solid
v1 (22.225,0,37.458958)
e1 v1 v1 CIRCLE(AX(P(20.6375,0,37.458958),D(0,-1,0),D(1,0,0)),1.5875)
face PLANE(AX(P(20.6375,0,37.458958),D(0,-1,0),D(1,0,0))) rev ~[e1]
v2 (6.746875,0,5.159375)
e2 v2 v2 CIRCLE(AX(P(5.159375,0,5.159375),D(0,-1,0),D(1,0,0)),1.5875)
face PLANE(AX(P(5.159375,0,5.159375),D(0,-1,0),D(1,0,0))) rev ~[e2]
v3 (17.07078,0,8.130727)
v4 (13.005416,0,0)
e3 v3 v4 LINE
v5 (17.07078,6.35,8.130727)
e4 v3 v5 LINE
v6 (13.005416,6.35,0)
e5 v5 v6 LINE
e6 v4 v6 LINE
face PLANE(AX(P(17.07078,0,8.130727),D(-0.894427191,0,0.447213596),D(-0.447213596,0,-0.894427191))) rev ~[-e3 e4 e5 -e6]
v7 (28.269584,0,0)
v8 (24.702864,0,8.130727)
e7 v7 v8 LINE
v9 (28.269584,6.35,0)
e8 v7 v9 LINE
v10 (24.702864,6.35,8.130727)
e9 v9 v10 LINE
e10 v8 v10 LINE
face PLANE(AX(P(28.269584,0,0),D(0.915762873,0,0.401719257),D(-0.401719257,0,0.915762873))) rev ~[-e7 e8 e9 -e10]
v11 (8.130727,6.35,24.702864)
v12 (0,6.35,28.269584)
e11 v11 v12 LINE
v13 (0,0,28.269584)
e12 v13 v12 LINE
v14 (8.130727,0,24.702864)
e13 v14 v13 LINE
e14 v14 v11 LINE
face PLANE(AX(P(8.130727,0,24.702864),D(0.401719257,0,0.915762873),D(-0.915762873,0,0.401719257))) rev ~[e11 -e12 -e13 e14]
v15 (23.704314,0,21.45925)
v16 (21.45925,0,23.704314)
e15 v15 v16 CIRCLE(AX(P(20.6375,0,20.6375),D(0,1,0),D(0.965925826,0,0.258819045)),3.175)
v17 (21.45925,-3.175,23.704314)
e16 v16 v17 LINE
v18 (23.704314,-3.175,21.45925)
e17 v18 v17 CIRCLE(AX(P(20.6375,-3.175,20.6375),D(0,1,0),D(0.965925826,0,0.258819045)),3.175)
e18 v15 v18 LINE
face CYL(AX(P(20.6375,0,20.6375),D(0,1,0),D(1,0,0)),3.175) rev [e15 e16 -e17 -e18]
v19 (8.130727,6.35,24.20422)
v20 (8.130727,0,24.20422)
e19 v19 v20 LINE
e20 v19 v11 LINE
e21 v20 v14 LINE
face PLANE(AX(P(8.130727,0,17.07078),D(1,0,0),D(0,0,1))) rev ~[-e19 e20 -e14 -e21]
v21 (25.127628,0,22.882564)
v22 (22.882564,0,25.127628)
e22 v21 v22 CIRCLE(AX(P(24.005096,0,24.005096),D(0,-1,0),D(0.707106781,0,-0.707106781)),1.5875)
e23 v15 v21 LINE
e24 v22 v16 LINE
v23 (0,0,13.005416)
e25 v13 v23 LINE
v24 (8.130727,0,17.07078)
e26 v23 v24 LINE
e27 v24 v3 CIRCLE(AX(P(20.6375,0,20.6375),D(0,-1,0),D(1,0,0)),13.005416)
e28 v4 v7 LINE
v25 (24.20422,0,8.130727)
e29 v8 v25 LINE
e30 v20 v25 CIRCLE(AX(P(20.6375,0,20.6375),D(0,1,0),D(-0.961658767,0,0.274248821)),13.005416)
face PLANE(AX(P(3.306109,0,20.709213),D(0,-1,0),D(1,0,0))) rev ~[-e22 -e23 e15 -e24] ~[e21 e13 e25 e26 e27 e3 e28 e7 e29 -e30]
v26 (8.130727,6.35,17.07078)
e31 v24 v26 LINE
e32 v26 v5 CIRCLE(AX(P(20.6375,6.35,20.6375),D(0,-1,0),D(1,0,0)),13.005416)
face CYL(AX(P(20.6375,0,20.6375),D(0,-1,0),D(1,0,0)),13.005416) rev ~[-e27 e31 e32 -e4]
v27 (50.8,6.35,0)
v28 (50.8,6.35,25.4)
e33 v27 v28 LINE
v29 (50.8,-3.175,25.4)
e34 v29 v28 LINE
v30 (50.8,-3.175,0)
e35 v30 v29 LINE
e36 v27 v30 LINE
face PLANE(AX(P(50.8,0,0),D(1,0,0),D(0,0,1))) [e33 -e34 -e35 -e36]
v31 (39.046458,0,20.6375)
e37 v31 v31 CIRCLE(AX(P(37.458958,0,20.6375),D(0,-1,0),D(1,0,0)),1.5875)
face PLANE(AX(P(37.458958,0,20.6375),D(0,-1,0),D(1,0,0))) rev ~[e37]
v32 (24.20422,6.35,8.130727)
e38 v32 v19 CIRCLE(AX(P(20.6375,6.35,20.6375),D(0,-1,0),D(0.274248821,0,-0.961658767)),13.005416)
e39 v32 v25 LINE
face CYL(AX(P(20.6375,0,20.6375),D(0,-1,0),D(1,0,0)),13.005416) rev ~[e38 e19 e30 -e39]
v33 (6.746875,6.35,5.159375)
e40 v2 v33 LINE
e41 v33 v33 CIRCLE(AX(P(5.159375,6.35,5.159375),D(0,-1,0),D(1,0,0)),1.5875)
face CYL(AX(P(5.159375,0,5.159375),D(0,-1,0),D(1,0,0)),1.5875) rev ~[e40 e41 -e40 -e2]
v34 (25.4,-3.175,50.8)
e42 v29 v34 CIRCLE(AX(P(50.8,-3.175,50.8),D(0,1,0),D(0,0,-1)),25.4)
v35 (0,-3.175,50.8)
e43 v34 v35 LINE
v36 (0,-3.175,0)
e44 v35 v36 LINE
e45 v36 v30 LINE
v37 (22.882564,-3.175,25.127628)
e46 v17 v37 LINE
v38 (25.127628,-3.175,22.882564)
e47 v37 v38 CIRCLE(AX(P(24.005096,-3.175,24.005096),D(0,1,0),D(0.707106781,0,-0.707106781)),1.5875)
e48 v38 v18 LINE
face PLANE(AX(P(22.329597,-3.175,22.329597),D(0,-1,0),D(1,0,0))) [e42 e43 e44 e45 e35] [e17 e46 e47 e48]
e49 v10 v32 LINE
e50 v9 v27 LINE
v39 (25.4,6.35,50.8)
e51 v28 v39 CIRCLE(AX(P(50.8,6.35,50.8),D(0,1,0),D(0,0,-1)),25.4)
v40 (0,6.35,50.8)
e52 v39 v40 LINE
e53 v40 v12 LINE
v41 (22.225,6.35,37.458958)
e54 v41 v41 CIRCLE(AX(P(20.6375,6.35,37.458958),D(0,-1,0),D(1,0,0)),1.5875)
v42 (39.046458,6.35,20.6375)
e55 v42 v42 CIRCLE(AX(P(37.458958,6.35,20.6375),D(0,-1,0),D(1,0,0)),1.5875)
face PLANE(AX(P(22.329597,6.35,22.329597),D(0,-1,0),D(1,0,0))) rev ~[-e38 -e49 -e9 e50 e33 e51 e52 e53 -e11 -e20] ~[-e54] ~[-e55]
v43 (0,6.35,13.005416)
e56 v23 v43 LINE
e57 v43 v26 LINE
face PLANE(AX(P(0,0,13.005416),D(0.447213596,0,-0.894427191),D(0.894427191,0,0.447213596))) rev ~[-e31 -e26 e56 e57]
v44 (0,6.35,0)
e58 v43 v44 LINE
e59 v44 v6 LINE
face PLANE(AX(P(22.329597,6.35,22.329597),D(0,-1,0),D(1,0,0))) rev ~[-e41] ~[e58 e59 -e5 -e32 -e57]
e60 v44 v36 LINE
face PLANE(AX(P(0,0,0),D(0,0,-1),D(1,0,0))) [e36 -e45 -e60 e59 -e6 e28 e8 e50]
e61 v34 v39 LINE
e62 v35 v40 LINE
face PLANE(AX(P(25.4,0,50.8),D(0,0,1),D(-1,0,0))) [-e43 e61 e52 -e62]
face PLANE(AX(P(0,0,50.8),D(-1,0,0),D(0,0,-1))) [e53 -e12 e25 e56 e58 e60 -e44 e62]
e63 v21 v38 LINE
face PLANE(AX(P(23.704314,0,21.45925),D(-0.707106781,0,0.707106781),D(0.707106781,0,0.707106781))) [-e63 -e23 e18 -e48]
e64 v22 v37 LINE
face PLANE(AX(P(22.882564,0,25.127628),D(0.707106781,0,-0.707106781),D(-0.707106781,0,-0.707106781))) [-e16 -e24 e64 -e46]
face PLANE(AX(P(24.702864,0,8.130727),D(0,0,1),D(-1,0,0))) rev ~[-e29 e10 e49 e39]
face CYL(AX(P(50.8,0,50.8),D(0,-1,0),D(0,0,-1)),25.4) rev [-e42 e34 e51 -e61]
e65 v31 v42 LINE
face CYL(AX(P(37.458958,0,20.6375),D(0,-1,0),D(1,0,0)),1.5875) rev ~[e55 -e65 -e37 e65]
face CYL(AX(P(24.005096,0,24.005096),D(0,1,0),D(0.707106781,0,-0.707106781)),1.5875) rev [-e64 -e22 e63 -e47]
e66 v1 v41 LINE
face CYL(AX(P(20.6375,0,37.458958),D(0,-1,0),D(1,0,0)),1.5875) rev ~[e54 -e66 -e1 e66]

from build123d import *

# Parameters (mm, degrees)
F9_DEPTH      = 3.175
F9_DEPTH_BACK = 6.35
F7_R          = 3.175
F10_DEPTH     = 3.176
F3_R          = 13.0054161967
F4_R          = 1.5875
F11_DEPTH     = 6.351


# Not quite as in the source:
# - a variable given as a bare number and used for a length is read in inches; the dataset says mm whatever the document's units were


with BuildPart() as f9:
    # F1 (on Front) → F9 (new body, two sides)
    with BuildSketch(Plane.XZ) as f9_sk:
        with BuildLine():
            Line((0, 50.8), (0, 0))
            Line((0, 0), (50.8, 0))
            Line((50.8, 0), (50.8, 25.4))
            ThreePointArc((50.8, 25.4), (32.8394877579, 32.8394877579), (25.4, 50.8))
            Line((25.4, 50.8), (0, 50.8))
        make_face()
    extrude(amount=F9_DEPTH)
    extrude(f9_sk.sketch, amount=-F9_DEPTH_BACK)

    # F8 (on Front) + F7 (on Front) → F10 (cut, through all)
    with BuildSketch(Plane.XZ):
        with BuildLine():
            Line((22.8825640303, 25.1276280605), (21.4592504682, 23.7043144985))
            Line((21.4592504682, 23.7043144985), (23.7043144985, 21.4592504682))
            Line((23.7043144985, 21.4592504682), (25.1276280605, 22.8825640303))
            ThreePointArc((25.1276280605, 22.8825640303), (25.1276280605, 25.1276280605), (22.8825640303, 25.1276280605))
        make_face()
    with BuildSketch(Plane.XZ):
        with Locations((20.6375, 20.6375)):
            Circle(F7_R)
    extrude(amount=F10_DEPTH, mode=Mode.SUBTRACT)

    # F3 (on Front) + F4 (on Front) + F6 (on face) → F11 (cut, through all)
    with BuildSketch(Plane.XZ):
        with Locations((20.6375, 20.6375)):
            Circle(F3_R)
    with BuildSketch(Plane.XZ):
        with Locations((37.4589580984, 20.6375)):
            Circle(F4_R)
        with Locations((20.6375, 37.4589580984)):
            Circle(F4_R)
        with Locations((5.159375, 5.159375)):
            Circle(F4_R)
    with BuildSketch(Plane.XZ):
        Polygon((17.0707799442, 8.1307274949), (13.0054161967, 0), (28.2695838033, 0), (24.7028637475, 8.1307274949), align=None)
        Polygon((8.1307274949, 24.7028637475), (0, 28.2695838033), (0, 13.0054161967), (8.1307274949, 17.0707799442), align=None)
    extrude(amount=-F11_DEPTH, mode=Mode.SUBTRACT)


solid = f9.part
